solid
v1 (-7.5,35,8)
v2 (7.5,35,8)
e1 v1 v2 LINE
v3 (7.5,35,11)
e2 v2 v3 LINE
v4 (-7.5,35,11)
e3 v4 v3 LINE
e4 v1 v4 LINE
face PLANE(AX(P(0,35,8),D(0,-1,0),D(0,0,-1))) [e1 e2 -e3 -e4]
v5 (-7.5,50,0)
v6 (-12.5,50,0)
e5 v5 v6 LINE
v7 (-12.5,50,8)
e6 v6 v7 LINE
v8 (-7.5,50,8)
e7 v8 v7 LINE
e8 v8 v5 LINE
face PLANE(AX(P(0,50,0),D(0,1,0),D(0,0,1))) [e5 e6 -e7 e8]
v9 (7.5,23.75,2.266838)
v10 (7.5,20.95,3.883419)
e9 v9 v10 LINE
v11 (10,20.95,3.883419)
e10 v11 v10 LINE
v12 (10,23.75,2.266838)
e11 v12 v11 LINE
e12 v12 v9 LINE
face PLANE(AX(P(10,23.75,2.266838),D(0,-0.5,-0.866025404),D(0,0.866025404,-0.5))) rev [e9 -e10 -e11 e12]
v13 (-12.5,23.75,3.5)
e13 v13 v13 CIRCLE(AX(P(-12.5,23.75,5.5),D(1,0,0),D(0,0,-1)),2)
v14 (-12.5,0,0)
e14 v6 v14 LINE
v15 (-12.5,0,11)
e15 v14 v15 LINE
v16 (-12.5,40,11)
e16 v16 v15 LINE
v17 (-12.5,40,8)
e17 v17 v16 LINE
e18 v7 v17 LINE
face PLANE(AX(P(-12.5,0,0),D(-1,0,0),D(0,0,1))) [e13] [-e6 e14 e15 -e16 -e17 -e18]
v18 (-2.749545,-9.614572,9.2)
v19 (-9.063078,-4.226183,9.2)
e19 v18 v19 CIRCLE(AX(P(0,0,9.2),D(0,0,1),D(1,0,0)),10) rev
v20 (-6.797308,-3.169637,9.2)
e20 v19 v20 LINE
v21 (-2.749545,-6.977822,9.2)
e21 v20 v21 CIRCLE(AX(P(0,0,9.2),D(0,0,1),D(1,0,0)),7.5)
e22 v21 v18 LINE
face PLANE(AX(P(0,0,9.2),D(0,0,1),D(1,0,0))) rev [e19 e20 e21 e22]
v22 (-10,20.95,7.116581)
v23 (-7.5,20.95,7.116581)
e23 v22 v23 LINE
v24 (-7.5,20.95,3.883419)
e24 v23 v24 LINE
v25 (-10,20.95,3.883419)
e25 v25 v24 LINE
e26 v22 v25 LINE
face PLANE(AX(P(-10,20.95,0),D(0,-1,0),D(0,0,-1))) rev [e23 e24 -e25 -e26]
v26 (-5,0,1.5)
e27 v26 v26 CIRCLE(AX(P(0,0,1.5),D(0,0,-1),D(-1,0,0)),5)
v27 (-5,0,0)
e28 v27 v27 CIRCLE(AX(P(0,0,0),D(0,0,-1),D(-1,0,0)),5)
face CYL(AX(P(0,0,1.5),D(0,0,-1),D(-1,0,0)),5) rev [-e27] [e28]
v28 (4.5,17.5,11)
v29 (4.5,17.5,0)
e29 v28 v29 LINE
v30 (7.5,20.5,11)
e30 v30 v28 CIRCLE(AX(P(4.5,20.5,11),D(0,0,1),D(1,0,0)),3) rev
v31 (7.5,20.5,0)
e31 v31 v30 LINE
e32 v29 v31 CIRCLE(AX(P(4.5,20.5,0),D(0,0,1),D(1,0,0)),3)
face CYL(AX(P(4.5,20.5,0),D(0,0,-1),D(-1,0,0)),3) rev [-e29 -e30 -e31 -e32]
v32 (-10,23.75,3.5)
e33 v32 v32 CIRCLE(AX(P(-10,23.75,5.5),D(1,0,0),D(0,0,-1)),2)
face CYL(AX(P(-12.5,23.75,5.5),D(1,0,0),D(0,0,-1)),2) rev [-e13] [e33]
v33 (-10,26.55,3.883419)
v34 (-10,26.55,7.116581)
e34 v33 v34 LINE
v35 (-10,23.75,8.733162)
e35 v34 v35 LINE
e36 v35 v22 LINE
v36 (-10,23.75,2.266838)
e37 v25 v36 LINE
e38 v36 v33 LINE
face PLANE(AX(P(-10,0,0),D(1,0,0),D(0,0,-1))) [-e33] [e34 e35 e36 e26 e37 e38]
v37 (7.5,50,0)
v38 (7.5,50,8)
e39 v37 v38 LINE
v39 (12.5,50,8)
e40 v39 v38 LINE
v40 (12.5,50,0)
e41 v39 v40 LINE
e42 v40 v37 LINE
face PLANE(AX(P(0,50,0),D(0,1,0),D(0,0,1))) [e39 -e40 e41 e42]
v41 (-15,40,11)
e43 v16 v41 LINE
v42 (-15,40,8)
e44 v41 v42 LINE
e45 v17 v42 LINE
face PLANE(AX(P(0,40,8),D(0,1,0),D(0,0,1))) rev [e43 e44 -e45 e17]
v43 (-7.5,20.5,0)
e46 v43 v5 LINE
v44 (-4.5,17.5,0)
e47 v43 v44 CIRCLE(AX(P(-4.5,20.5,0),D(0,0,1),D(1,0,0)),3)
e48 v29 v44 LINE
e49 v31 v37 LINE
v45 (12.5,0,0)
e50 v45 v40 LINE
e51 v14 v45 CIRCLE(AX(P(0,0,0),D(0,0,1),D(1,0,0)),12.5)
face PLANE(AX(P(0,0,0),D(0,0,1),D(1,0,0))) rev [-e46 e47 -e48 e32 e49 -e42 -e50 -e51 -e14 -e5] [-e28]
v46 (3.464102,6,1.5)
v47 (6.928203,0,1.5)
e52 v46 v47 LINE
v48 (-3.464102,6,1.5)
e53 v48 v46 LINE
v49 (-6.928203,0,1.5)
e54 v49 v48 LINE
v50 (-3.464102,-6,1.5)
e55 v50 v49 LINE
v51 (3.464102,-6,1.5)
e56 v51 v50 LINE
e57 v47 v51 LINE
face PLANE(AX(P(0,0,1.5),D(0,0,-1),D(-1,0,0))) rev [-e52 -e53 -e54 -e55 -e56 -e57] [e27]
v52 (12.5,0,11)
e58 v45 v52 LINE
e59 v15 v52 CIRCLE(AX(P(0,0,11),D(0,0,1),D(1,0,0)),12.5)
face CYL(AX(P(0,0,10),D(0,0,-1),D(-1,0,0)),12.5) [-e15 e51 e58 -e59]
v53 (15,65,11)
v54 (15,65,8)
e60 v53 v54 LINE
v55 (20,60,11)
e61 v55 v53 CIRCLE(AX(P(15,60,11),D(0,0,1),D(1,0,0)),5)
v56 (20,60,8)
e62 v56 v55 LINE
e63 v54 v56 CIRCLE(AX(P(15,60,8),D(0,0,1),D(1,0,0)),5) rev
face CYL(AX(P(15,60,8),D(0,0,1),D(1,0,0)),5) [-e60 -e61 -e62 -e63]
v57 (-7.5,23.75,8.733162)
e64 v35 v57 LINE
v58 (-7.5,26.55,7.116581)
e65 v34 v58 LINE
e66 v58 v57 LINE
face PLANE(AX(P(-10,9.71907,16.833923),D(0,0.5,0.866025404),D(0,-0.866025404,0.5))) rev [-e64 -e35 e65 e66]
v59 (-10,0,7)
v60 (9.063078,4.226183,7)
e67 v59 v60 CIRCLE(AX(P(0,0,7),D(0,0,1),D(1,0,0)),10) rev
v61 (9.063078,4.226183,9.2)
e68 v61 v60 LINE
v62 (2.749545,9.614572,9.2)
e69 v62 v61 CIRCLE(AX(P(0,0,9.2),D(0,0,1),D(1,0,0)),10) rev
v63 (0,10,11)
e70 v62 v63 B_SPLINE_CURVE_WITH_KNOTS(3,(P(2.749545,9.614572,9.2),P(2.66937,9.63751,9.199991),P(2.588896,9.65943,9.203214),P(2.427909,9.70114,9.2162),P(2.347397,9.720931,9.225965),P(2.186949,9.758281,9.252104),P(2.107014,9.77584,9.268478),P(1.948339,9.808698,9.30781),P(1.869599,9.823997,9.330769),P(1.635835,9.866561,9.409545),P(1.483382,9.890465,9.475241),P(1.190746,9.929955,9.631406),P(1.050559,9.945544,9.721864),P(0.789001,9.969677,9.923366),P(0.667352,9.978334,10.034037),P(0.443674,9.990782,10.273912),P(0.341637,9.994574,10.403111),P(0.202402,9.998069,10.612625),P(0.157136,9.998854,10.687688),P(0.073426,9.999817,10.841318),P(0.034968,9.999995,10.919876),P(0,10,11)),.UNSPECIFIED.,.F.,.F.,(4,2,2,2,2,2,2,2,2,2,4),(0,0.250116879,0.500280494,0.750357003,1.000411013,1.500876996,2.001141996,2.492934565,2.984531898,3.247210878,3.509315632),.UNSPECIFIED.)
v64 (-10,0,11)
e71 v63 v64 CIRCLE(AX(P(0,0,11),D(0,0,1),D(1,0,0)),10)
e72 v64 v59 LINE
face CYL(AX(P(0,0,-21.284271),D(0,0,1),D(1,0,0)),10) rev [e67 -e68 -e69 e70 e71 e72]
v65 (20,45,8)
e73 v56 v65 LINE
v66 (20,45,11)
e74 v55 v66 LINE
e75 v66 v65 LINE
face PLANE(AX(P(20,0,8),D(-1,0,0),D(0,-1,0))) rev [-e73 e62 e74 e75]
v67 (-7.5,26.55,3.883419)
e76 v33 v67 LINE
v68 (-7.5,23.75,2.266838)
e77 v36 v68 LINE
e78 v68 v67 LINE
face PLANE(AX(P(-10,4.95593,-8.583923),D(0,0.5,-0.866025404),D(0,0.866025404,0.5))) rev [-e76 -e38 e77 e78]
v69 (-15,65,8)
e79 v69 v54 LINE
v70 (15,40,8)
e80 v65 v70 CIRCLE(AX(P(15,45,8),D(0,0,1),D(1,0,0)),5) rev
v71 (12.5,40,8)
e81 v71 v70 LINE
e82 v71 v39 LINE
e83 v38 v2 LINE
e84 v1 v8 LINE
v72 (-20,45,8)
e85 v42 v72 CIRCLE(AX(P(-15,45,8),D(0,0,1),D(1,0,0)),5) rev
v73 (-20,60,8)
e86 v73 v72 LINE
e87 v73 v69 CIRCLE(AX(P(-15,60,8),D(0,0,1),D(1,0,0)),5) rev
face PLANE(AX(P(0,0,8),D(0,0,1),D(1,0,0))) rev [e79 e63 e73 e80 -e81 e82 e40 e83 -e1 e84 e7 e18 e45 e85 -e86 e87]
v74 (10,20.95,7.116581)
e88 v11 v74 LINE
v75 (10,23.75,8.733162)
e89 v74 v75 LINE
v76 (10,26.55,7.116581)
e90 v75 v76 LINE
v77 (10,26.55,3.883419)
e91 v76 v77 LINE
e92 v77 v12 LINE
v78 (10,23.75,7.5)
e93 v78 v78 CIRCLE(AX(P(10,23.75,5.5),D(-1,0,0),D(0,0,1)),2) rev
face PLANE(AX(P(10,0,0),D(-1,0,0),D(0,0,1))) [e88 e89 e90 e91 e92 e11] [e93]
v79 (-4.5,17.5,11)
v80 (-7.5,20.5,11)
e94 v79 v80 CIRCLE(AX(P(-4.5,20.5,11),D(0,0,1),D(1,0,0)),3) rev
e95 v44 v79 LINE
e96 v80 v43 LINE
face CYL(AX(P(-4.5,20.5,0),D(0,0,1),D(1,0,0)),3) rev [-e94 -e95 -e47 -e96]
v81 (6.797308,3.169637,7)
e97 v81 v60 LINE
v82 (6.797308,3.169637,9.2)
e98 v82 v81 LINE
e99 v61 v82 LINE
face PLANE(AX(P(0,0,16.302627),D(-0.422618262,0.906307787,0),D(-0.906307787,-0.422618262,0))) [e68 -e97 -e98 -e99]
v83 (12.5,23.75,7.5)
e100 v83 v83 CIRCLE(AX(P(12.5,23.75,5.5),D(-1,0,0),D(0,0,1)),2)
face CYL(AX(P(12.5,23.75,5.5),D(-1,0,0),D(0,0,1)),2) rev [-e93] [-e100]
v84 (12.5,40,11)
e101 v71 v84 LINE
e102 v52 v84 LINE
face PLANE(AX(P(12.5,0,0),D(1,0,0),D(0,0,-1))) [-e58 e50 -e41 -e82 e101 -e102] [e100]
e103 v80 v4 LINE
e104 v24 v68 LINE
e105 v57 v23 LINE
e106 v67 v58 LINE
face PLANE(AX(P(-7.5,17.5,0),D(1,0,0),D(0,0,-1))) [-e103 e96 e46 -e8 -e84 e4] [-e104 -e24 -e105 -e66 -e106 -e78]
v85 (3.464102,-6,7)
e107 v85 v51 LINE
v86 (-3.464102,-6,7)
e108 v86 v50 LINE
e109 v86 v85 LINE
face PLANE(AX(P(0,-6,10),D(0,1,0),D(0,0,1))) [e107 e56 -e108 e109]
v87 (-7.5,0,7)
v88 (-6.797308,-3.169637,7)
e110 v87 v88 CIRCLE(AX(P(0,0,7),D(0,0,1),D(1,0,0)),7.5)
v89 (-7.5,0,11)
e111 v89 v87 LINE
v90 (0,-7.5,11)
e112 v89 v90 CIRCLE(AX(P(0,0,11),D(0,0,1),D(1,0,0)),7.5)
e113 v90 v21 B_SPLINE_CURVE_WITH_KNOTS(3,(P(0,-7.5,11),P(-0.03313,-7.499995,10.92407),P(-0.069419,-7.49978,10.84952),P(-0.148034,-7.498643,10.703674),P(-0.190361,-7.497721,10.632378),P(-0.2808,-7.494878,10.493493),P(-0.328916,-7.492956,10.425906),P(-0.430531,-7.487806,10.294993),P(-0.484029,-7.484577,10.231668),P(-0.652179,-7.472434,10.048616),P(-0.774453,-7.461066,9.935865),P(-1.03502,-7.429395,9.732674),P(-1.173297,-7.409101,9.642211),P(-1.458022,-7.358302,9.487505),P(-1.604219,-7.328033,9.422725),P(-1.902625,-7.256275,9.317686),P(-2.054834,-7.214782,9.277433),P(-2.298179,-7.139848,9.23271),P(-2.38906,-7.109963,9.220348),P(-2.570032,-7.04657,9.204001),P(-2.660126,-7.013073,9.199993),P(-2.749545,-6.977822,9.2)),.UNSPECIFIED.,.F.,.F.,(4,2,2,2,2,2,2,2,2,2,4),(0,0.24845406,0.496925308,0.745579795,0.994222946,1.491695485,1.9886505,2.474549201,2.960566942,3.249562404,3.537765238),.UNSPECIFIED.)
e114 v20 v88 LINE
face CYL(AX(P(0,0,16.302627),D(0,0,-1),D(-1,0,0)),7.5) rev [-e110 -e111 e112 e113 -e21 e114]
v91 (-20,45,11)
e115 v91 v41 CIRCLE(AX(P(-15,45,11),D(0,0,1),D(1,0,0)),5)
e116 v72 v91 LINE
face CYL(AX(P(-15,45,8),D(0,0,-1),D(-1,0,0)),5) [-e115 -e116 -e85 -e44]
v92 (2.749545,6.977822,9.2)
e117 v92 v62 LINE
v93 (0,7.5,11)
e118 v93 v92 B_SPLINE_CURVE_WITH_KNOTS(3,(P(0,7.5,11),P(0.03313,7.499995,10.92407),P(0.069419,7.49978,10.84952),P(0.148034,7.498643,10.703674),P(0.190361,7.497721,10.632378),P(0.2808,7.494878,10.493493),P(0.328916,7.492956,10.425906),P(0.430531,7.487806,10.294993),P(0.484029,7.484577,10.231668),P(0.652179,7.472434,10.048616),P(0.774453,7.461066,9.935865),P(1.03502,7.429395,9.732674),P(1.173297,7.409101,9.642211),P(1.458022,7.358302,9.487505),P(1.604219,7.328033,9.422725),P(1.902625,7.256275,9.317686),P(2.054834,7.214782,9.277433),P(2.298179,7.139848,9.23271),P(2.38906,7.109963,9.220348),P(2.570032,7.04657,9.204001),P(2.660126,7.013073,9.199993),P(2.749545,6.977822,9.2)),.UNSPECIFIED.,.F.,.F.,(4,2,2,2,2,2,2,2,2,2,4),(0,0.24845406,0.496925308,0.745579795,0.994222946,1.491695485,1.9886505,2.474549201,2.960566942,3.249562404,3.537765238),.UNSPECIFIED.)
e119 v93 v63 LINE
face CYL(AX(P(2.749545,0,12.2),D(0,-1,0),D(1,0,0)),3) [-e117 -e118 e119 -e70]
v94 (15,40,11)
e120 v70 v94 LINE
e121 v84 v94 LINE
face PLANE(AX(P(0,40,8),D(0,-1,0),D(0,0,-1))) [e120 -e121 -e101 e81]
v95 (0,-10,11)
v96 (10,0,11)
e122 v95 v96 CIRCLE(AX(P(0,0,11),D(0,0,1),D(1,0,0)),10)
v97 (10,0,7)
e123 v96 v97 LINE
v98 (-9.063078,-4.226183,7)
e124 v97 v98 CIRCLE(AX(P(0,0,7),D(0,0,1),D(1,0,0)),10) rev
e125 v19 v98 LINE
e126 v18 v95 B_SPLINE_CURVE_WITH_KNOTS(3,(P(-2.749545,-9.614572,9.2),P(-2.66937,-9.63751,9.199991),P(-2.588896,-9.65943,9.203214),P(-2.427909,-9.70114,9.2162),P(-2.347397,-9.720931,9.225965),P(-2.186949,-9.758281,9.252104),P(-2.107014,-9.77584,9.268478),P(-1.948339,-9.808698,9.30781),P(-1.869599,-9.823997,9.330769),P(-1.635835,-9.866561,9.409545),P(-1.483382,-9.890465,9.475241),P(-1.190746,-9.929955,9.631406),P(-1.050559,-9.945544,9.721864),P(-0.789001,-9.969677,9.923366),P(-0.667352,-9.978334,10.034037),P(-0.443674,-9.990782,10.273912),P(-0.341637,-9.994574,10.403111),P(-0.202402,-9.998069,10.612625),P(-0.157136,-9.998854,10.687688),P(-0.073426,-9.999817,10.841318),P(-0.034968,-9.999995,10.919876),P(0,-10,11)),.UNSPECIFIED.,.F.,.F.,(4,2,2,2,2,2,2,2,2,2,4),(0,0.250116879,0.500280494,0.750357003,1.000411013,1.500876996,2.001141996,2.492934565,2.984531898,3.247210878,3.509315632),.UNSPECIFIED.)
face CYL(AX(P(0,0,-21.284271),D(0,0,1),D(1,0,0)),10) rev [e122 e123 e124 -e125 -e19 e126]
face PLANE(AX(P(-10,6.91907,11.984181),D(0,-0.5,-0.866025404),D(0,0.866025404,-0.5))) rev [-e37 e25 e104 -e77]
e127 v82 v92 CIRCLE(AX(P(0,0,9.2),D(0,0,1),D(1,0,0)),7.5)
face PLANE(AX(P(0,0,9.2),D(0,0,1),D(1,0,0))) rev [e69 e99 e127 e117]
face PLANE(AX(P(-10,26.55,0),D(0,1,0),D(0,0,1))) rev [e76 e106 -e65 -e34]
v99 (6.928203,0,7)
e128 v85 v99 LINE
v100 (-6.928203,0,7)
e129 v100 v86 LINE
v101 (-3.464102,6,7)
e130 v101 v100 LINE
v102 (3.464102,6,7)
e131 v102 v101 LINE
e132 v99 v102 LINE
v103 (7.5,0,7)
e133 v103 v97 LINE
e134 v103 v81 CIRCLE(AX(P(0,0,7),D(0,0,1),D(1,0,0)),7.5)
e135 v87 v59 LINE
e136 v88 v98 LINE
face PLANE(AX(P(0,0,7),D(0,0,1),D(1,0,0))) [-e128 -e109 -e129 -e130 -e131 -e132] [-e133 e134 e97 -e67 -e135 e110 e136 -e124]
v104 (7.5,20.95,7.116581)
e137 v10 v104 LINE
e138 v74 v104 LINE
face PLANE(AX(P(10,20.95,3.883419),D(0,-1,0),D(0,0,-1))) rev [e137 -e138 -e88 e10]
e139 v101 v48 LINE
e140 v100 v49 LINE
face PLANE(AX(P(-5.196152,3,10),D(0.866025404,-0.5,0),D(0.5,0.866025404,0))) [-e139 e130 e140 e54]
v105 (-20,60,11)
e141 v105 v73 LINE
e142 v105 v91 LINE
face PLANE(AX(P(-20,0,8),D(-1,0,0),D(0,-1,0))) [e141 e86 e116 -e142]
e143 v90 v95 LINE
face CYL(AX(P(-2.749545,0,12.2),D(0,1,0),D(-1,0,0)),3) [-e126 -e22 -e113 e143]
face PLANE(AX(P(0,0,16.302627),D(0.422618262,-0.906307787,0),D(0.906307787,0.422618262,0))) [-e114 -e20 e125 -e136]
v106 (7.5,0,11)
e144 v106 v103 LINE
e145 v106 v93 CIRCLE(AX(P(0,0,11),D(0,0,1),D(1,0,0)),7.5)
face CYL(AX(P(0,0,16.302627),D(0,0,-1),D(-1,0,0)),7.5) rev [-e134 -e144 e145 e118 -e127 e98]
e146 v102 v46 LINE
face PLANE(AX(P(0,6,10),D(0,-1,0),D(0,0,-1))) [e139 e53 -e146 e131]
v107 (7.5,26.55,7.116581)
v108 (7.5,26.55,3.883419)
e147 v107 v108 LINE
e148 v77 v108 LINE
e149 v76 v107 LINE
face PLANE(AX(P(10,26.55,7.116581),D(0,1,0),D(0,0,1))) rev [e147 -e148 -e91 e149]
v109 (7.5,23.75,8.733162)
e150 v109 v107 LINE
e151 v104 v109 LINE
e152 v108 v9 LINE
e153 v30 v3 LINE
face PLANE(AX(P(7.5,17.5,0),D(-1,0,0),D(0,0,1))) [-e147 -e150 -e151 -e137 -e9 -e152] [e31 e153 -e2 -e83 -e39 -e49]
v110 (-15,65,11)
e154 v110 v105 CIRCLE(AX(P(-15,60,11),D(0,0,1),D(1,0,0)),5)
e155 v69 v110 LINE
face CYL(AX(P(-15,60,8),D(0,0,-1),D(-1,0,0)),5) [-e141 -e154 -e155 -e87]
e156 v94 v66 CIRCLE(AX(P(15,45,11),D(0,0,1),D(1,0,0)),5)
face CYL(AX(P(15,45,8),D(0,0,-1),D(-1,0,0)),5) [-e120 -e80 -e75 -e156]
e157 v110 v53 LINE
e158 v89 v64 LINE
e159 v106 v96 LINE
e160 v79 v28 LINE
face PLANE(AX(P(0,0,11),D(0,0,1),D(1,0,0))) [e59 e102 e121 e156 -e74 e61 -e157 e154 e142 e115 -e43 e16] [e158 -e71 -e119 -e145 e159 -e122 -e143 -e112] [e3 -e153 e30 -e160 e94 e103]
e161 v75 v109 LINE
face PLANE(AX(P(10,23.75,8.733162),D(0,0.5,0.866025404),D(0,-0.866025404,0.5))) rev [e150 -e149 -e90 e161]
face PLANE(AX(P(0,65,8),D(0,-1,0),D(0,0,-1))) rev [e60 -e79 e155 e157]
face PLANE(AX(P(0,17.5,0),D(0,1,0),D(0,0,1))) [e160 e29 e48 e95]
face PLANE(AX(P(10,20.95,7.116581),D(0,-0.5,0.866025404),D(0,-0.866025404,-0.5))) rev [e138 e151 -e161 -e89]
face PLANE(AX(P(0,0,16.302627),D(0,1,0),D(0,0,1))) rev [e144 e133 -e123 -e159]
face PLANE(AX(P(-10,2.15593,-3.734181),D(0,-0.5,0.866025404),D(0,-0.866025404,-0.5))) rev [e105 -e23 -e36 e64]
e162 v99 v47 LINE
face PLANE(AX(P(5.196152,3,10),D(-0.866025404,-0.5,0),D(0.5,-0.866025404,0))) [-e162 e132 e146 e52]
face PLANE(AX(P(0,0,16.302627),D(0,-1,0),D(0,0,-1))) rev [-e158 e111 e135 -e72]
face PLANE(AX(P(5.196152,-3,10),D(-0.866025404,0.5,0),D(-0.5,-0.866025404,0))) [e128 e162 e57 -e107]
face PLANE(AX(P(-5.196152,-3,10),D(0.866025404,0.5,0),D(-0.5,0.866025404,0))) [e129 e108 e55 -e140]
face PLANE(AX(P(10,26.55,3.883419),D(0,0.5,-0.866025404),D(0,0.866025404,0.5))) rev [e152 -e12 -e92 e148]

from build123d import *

# Parameters (mm, degrees)
SKETCH1_R           = 12.5
BOSS_EXTRUDE1_DEPTH = 10
SKETCH2_R           = 12.5
SKETCH2_R_2         = 5
BOSS_EXTRUDE2_DEPTH = 1.5
CUT_EXTRUDE3_START  = -3
SKETCH3_R           = 12.5
CUT_EXTRUDE3_DEPTH  = 3
SKETCH4_R           = 12.5
SKETCH4_R_2         = 7.5
BOSS_EXTRUDE3_DEPTH = 4
CUT_EXTRUDE4_START  = -4
SKETCH5_R           = 10
SKETCH5_R_2         = 7.5
CUT_EXTRUDE4_DEPTH  = 4
BOSS_EXTRUDE4_DEPTH = 4
BOSS_EXTRUDE5_START = -1.8
BOSS_EXTRUDE5_DEPTH = 1.8
FILLET1_R           = 3
BOSS_EXTRUDE6_START = -11
BOSS_EXTRUDE6_DEPTH = 11
CUT_EXTRUDE5_DEPTH  = 12.5
CUT_EXTRUDE6_DEPTH  = 2.5
CUT_EXTRUDE7_DEPTH  = 40.080046087
SKETCH12_R          = 2
CUT_EXTRUDE8_DEPTH  = 38.696153679
CUT_EXTRUDE9_DEPTH  = 2.5
FILLET2_R           = 3
SKETCH14_W          = 5
SKETCH14_H          = 11
BOSS_EXTRUDE7_DEPTH = 20
SKETCH15_W          = 15
SKETCH15_H          = 15
BOSS_EXTRUDE8_DEPTH = 3
SKETCH16_W          = 7.5
SKETCH16_H          = 5
CUT_EXTRUDE10_DEPTH = 3
FILLET3_R           = 5


with BuildPart() as part:
    # Sketch1 → Boss-Extrude1 (new body)
    with BuildSketch(Plane.XY):
        Circle(SKETCH1_R)
        Polygon((3.464101615, -6), (6.92820323, 0), (3.464101615, 6), (-3.464101615, 6), (-6.92820323, 0), (-3.464101615, -6), align=None, mode=Mode.SUBTRACT)
    extrude(amount=BOSS_EXTRUDE1_DEPTH)

    # Sketch2 → Boss-Extrude2 (add)
    with BuildSketch(Plane(origin=(0, 0, 0), x_dir=(-1, 0, 0), z_dir=(0, 0, -1))):
        with Locations(Location((0, 0, 0), (0, 0, 180))):
            Circle(SKETCH2_R)
        Circle(SKETCH2_R_2, mode=Mode.SUBTRACT)
    extrude(amount=-BOSS_EXTRUDE2_DEPTH)

    # Sketch3 → Cut-Extrude3 (cut)
    with BuildSketch(Plane.XY.offset(10).offset(CUT_EXTRUDE3_START)):
        Circle(SKETCH3_R)
    extrude(amount=CUT_EXTRUDE3_DEPTH, mode=Mode.SUBTRACT)

    # Sketch4 → Boss-Extrude3 (add)
    with BuildSketch(Plane.XY.offset(7)):
        Circle(SKETCH4_R)
        Circle(SKETCH4_R_2, mode=Mode.SUBTRACT)
    extrude(amount=BOSS_EXTRUDE3_DEPTH)

    # Sketch5 → Cut-Extrude4 (cut)
    with BuildSketch(Plane.XY.offset(11).offset(CUT_EXTRUDE4_START)):
        Circle(SKETCH5_R)
        Circle(SKETCH5_R_2, mode=Mode.SUBTRACT)
    extrude(amount=CUT_EXTRUDE4_DEPTH, mode=Mode.SUBTRACT)

    # Sketch6 → Boss-Extrude4 (add)
    with BuildSketch(Plane.XY.offset(7)):
        with BuildLine():
            ThreePointArc((-6.797308403, -3.169636963), (-7.322220053, -1.623297105), (-7.5, 0))
            Line((-7.5, 0), (-10, 0))
            ThreePointArc((-10, 0), (-9.762960071, -2.164396139), (-9.06307787, -4.226182617))
            Line((-9.06307787, -4.226182617), (-6.797308403, -3.169636963))
        make_face()
        with BuildLine():
            ThreePointArc((6.797308403, 3.169636963), (7.322220053, 1.623297105), (7.5, 0))
            Line((7.5, 0), (10, 0))
            ThreePointArc((10, 0), (9.762960071, 2.164396139), (9.06307787, 4.226182617))
            Line((9.06307787, 4.226182617), (6.797308403, 3.169636963))
        make_face()
    extrude(amount=BOSS_EXTRUDE4_DEPTH)

    # Sketch7 → Boss-Extrude5 (add)
    with BuildSketch(Plane.XY.offset(11).offset(BOSS_EXTRUDE5_START)):
        with BuildLine():
            Line((0, 10), (0, 7.5))
            ThreePointArc((0, 7.5), (4.029747063, 6.325435844), (6.797308403, 3.169636963))
            Line((6.797308403, 3.169636963), (9.06307787, 4.226182617))
            ThreePointArc((9.06307787, 4.226182617), (5.372996083, 8.433914458), (0, 10))
        make_face()
        with BuildLine():
            Line((0, -10), (0, -7.5))
            ThreePointArc((0, -7.5), (-4.029747063, -6.325435844), (-6.797308403, -3.169636963))
            Line((-6.797308403, -3.169636963), (-9.06307787, -4.226182617))
            ThreePointArc((-9.06307787, -4.226182617), (-5.372996083, -8.433914458), (0, -10))
        make_face()
    extrude(amount=BOSS_EXTRUDE5_DEPTH)

    # Fillet1
    # the kernel refuses this fillet: 3 mm, written as the material it takes off along each edge
    with BuildSketch(Plane(origin=(0, 16.873863542, 9.2), x_dir=(1, 0, 0), z_dir=(0, -1, 0))) as fillet1_piece_1_section:
        with BuildLine():
            CenterArc((2.749545417, 3), FILLET1_R, 203.578178478, 66.421821522)
            Line((0, 1.8), (0, 0))
            Line((0, 0), (2.749545417, 0))
        make_face()
    fillet1_piece_1 = extrude(amount=16.247727085, mode=Mode.PRIVATE)
    fillet1_piece_1 = fillet1_piece_1 & Plane(origin=(0, 0, 9.68499996), x_dir=(1, 0, 0), z_dir=(0, 0, -1)) * Cylinder(10, 44, mode=Mode.PRIVATE)
    add(fillet1_piece_1, mode=Mode.SUBTRACT)
    with BuildSketch(Plane(origin=(0, -16.873863542, 9.2), x_dir=(-1, 0, 0), z_dir=(0, 1, 0))) as fillet1_piece_2_section:
        with BuildLine():
            CenterArc((2.749545417, 3), FILLET1_R, 203.578178478, 66.421821522)
            Line((0, 1.8), (0, 0))
            Line((0, 0), (2.749545417, 0))
        make_face()
    fillet1_piece_2 = extrude(amount=16.247727085, mode=Mode.PRIVATE)
    fillet1_piece_2 = fillet1_piece_2 & Plane(origin=(0, 0, 9.68499996), x_dir=(1, 0, 0), z_dir=(0, 0, -1)) * Cylinder(10, 44, mode=Mode.PRIVATE)
    add(fillet1_piece_2, mode=Mode.SUBTRACT)

    # Sketch8 → Boss-Extrude6 (add)
    with BuildSketch(Plane.XY.offset(11).offset(BOSS_EXTRUDE6_START)):
        with BuildLine():
            Line((12.5, 0), (12.5, 30))
            Line((12.5, 30), (-12.5, 30))
            Line((-12.5, 30), (-12.5, 0))
            ThreePointArc((-12.5, 0), (0, 12.5), (12.5, 0))
        make_face()
    extrude(amount=BOSS_EXTRUDE6_DEPTH)

    # Sketch9 → Cut-Extrude5 (cut)
    with BuildSketch(Plane(origin=(0, 30, 0), x_dir=(1, 0, 0), z_dir=(0, 1, 0))):
        Polygon((-7.5, 0), (-7.5, -5.5), (-7.5, -11), (7.5, -11), (7.5, -5.5), (7.5, 0), align=None)
    extrude(amount=-CUT_EXTRUDE5_DEPTH, mode=Mode.SUBTRACT)

    # Sketch10 → Cut-Extrude6 (cut)
    with BuildSketch(Plane(origin=(-7.5, 0, 0), x_dir=(0, 0, -1), z_dir=(1, 0, 0))):
        Polygon((-3.883419246, 26.55), (-5.5, 26.55), (-5.5, 20.95), (-3.883419246, 20.95), (-2.266838493, 23.75), align=None)
        Polygon((-5.5, 20.95), (-5.5, 26.55), (-7.116580754, 26.55), (-8.733161507, 23.75), (-7.116580754, 20.95), align=None)
    extrude(amount=-CUT_EXTRUDE6_DEPTH, mode=Mode.SUBTRACT)

    # Sketch11 → Cut-Extrude7 (cut, through all)
    with BuildSketch(Plane(origin=(-10, 0, 0), x_dir=(0, 0, -1), z_dir=(1, 0, 0))):
        with BuildLine():
            ThreePointArc((-3.5, 23.75), (-4.085786438, 25.164213562), (-5.5, 25.75))
            Line((-5.5, 25.75), (-5.5, 21.75))
            ThreePointArc((-5.5, 21.75), (-4.085786438, 22.335786438), (-3.5, 23.75))
        make_face()
        with BuildLine():
            Line((-5.5, 21.75), (-5.5, 25.75))
            ThreePointArc((-5.5, 25.75), (-7.5, 23.75), (-5.5, 21.75))
        make_face()
    extrude(amount=-CUT_EXTRUDE7_DEPTH, mode=Mode.SUBTRACT)

    # Sketch12 → Cut-Extrude8 (cut, through all)
    with BuildSketch(Plane.ZY.offset(-7.5)):
        with Locations(Location((5.5, 23.75, 0), (0, 0, 180))):
            Circle(SKETCH12_R)
    extrude(amount=-CUT_EXTRUDE8_DEPTH, mode=Mode.SUBTRACT)

    # Sketch13 → Cut-Extrude9 (cut)
    with BuildSketch(Plane.ZY.offset(-7.5)):
        Polygon((8.733161507, 23.75), (7.116580754, 26.55), (3.883419246, 26.55), (2.266838493, 23.75), (3.883419246, 20.95), (7.116580754, 20.95), align=None)
    extrude(amount=-CUT_EXTRUDE9_DEPTH, mode=Mode.SUBTRACT)

    # Fillet2
    fillet2_edges = [part.edges().sort_by_distance(p)[0] for p in [
        (-7.5, 17.5, 5.5),
        (7.5, 17.5, 5.5),
    ]]
    fillet(fillet2_edges, radius=FILLET2_R)

    # Sketch14 → Boss-Extrude7 (add)
    with BuildSketch(Plane(origin=(0, 30, 0), x_dir=(1, 0, 0), z_dir=(0, 1, 0))):
        with Locations((10, -5.5)):
            Rectangle(SKETCH14_W, SKETCH14_H)
        with Locations((-10, -5.5)):
            Rectangle(SKETCH14_W, SKETCH14_H)
    extrude(amount=BOSS_EXTRUDE7_DEPTH)

    # Sketch15 → Boss-Extrude8 (add)
    with BuildSketch(Plane.XY.offset(11)):
        with Locations((0, 42.5)):
            Rectangle(SKETCH15_W, SKETCH15_H)
        Polygon((-12.5, 50), (-7.5, 50), (7.5, 50), (12.5, 50), (12.5, 35), (20, 35), (20, 65), (-20, 65), (-20, 35), (-12.5, 35), align=None)
    extrude(amount=-BOSS_EXTRUDE8_DEPTH)

    # Sketch16 → Cut-Extrude10 (cut)
    with BuildSketch(Plane.XY.offset(11)):
        with Locations((16.25, 37.5)):
            Rectangle(SKETCH16_W, SKETCH16_H)
        with Locations((-16.25, 37.5)):
            Rectangle(SKETCH16_W, SKETCH16_H)
    extrude(amount=-CUT_EXTRUDE10_DEPTH, mode=Mode.SUBTRACT)

    # Fillet3
    fillet3_edges = [part.edges().sort_by_distance(p)[0] for p in [
        (-20, 65, 9.5),
        (20, 65, 9.5),
        (20, 40, 9.5),
        (-20, 40, 9.5),
    ]]
    fillet(fillet3_edges, radius=FILLET3_R)


solid = part.part
